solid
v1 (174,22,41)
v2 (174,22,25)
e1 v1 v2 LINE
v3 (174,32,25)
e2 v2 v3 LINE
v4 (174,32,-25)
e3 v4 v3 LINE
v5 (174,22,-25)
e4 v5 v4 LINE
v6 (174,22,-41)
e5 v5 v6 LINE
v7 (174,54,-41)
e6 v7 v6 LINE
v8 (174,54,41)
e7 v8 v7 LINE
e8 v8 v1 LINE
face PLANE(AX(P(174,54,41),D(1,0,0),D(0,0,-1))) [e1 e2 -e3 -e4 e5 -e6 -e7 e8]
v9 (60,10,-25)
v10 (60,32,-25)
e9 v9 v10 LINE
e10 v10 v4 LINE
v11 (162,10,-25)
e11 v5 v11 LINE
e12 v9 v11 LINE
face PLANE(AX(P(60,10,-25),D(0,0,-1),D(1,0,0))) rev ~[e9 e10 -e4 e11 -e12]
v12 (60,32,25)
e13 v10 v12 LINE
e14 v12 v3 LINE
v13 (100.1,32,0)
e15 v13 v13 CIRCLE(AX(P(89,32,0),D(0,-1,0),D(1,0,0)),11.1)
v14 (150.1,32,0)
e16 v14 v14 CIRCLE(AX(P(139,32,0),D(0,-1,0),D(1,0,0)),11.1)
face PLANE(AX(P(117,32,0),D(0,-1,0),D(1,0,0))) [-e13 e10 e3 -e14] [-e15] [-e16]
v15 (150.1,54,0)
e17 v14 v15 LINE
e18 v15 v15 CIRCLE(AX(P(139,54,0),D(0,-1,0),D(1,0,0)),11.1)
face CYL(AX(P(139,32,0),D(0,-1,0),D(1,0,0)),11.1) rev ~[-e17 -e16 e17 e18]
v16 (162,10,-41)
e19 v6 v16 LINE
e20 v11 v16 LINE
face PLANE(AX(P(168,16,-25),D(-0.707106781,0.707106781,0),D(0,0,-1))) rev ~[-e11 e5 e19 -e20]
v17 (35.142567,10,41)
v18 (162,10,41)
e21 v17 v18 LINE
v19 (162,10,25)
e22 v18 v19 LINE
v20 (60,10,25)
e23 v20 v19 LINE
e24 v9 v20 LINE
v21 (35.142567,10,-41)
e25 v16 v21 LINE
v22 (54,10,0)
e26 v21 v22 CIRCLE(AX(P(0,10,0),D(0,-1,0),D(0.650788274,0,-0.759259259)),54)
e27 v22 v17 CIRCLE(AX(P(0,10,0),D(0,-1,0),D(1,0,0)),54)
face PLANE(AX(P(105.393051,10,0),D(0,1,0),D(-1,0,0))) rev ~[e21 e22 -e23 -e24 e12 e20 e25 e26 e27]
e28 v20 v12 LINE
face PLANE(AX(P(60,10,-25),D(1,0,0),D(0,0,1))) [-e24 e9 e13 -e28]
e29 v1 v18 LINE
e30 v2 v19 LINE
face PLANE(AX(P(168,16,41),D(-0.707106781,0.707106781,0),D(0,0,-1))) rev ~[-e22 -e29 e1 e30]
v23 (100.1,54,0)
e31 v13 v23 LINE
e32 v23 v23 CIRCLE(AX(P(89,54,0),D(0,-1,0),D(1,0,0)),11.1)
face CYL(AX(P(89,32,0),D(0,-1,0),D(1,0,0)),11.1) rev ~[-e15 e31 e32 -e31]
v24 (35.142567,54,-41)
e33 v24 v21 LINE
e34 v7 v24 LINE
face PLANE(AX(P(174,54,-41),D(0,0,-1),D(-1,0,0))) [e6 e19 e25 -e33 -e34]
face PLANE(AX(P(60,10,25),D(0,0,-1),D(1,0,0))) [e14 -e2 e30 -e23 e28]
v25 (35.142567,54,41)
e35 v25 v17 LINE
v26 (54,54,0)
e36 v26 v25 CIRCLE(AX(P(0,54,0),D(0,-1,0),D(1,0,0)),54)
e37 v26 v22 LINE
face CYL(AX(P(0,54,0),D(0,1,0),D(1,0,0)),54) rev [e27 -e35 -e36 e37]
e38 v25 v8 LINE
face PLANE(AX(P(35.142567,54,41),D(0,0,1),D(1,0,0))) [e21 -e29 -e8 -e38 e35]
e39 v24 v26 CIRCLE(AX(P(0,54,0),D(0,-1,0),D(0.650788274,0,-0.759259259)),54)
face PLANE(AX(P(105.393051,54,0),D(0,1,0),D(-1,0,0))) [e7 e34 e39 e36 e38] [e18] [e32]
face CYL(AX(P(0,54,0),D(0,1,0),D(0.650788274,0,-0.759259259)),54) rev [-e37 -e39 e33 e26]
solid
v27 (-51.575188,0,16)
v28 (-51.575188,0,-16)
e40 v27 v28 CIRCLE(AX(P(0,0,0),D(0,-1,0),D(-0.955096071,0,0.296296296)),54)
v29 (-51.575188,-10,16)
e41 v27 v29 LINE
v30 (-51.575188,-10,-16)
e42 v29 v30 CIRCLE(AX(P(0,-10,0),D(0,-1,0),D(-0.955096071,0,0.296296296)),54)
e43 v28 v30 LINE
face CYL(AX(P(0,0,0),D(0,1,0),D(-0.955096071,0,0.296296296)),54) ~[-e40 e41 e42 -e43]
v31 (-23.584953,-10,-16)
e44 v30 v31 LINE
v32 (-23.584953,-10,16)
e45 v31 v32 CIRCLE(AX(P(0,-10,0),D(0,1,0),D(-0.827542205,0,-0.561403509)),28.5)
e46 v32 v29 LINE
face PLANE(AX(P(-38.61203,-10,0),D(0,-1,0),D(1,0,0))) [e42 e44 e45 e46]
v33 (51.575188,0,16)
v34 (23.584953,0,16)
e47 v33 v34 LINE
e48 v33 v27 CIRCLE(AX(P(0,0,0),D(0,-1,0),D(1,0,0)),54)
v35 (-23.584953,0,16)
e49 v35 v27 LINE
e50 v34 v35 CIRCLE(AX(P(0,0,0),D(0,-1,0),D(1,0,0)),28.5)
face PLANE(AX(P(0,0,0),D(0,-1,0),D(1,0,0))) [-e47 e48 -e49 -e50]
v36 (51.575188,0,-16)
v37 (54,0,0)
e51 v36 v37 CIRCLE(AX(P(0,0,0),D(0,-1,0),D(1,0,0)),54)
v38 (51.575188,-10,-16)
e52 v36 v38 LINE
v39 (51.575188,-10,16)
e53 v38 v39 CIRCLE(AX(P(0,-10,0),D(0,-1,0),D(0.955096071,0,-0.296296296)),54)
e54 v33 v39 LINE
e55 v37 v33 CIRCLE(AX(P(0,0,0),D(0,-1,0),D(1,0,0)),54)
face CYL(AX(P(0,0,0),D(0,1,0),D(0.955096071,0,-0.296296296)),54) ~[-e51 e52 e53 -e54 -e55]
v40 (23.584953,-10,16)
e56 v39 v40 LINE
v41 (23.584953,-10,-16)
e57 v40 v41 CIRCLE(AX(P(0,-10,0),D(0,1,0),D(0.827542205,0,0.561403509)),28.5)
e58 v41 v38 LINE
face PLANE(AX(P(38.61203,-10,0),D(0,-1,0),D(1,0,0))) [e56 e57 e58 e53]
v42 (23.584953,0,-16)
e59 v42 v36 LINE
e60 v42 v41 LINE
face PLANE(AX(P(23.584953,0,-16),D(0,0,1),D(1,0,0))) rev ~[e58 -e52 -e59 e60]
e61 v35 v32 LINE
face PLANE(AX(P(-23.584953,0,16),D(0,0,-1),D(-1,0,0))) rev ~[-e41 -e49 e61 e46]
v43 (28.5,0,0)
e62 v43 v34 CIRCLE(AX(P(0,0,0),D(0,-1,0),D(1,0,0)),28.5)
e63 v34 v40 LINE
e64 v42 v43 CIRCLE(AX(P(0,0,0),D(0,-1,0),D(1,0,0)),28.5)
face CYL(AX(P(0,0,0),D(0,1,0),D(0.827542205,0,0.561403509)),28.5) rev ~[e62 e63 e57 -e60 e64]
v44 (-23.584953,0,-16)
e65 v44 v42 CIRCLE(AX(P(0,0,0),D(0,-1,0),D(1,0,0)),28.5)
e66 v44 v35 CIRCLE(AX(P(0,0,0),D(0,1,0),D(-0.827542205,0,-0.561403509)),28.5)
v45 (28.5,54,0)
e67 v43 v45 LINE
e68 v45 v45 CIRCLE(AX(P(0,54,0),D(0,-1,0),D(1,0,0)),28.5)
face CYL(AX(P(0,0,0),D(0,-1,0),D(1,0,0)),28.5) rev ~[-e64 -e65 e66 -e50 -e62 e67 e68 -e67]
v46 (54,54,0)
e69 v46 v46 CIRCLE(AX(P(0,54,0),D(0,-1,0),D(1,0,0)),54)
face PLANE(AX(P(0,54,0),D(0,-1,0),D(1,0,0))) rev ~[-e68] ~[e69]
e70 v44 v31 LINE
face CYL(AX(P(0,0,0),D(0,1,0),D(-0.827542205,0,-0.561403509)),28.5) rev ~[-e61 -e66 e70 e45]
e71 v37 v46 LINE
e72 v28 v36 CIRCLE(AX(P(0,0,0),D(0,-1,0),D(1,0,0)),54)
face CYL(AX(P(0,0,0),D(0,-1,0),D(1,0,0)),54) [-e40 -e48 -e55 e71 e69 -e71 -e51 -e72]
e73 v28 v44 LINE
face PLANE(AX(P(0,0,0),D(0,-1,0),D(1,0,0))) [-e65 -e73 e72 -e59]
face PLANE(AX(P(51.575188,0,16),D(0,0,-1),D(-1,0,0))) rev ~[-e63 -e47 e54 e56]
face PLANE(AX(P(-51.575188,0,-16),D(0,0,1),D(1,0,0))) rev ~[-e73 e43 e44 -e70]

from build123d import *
from build123d import SkipClean  # not in build123d's __all__

# Parameters (mm, degrees)
F0_R      = 54
F0_R_2    = 28.5
F1_DEPTH  = 54
F3_DEPTH  = 10
F5_DEPTH  = 44
F6_W      = 114
F6_H      = 50
F7_DEPTH  = 22
F8_SIZE   = 12
F9_R      = 11.1
F10_DEPTH = 22


with BuildPart() as f1:
    # F0 (on Front) → F1 (new body)
    with BuildSketch(Plane.XZ):
        Circle(F0_R)
        Circle(F0_R_2, mode=Mode.SUBTRACT)
    extrude(amount=-F1_DEPTH)

    # F2 (on Front) → F3 (join)
    with BuildSketch(Plane.XZ):
        with BuildLine():
            ThreePointArc((-23.5849528301, -16), (-28.5, 0), (-23.5849528301, 16))
            Line((-23.5849528301, 16), (-51.5751878329, 16))
            ThreePointArc((-51.5751878329, 16), (-54, 0), (-51.5751878329, -16))
            Line((-51.5751878329, -16), (-23.5849528301, -16))
        make_face()
        with BuildLine():
            Line((51.5751878329, 16), (23.5849528301, 16))
            ThreePointArc((23.5849528301, 16), (28.5, 0), (23.5849528301, -16))
            Line((23.5849528301, -16), (51.5751878329, -16))
            ThreePointArc((51.5751878329, -16), (54, 0), (51.5751878329, 16))
        make_face()
    with SkipClean():  # cleaning this boolean's faces spoils the solid; the shape is the same uncleaned
        extrude(amount=F3_DEPTH)


with BuildPart() as f5:
    # F4 (on face) → F5 (new body)
    with BuildSketch(Plane(origin=(0, 54, 0), x_dir=(-1, 0, 0), z_dir=(0, 1, 0))):
        with BuildLine():
            Line((-174, 41), (-174, 0))
            Line((-174, 0), (-174, -41))
            Line((-174, -41), (-35.1425667816, -41))
            ThreePointArc((-35.1425667816, -41), (-49.0596504584, -22.5643678594), (-54, 0))
            ThreePointArc((-54, 0), (-49.0596504584, 22.5643678594), (-35.1425667816, 41))
            Line((-35.1425667816, 41), (-174, 41))
        make_face()
    extrude(amount=-F5_DEPTH)

    # F6 (on face) → F7 (cut)
    with BuildSketch(Plane.XZ.offset(-10)):
        with Locations((117, 0)):
            Rectangle(F6_W, F6_H)
    extrude(amount=-F7_DEPTH, mode=Mode.SUBTRACT)

    # F8
    f8_edges = [f5.edges().sort_by_distance(p)[0] for p in [
        (174, 10, 33),
        (174, 10, -33),
    ]]
    chamfer(f8_edges, length=F8_SIZE)

    # F9 (on face) → F10 (cut, through all)
    with BuildSketch(Plane.XZ.offset(-32)):
        with Locations((139, 0)):
            Circle(F9_R)
        with Locations((89, 0)):
            Circle(F9_R)
    extrude(amount=-F10_DEPTH, mode=Mode.SUBTRACT)


solid = Compound([f1.part, f5.part])
